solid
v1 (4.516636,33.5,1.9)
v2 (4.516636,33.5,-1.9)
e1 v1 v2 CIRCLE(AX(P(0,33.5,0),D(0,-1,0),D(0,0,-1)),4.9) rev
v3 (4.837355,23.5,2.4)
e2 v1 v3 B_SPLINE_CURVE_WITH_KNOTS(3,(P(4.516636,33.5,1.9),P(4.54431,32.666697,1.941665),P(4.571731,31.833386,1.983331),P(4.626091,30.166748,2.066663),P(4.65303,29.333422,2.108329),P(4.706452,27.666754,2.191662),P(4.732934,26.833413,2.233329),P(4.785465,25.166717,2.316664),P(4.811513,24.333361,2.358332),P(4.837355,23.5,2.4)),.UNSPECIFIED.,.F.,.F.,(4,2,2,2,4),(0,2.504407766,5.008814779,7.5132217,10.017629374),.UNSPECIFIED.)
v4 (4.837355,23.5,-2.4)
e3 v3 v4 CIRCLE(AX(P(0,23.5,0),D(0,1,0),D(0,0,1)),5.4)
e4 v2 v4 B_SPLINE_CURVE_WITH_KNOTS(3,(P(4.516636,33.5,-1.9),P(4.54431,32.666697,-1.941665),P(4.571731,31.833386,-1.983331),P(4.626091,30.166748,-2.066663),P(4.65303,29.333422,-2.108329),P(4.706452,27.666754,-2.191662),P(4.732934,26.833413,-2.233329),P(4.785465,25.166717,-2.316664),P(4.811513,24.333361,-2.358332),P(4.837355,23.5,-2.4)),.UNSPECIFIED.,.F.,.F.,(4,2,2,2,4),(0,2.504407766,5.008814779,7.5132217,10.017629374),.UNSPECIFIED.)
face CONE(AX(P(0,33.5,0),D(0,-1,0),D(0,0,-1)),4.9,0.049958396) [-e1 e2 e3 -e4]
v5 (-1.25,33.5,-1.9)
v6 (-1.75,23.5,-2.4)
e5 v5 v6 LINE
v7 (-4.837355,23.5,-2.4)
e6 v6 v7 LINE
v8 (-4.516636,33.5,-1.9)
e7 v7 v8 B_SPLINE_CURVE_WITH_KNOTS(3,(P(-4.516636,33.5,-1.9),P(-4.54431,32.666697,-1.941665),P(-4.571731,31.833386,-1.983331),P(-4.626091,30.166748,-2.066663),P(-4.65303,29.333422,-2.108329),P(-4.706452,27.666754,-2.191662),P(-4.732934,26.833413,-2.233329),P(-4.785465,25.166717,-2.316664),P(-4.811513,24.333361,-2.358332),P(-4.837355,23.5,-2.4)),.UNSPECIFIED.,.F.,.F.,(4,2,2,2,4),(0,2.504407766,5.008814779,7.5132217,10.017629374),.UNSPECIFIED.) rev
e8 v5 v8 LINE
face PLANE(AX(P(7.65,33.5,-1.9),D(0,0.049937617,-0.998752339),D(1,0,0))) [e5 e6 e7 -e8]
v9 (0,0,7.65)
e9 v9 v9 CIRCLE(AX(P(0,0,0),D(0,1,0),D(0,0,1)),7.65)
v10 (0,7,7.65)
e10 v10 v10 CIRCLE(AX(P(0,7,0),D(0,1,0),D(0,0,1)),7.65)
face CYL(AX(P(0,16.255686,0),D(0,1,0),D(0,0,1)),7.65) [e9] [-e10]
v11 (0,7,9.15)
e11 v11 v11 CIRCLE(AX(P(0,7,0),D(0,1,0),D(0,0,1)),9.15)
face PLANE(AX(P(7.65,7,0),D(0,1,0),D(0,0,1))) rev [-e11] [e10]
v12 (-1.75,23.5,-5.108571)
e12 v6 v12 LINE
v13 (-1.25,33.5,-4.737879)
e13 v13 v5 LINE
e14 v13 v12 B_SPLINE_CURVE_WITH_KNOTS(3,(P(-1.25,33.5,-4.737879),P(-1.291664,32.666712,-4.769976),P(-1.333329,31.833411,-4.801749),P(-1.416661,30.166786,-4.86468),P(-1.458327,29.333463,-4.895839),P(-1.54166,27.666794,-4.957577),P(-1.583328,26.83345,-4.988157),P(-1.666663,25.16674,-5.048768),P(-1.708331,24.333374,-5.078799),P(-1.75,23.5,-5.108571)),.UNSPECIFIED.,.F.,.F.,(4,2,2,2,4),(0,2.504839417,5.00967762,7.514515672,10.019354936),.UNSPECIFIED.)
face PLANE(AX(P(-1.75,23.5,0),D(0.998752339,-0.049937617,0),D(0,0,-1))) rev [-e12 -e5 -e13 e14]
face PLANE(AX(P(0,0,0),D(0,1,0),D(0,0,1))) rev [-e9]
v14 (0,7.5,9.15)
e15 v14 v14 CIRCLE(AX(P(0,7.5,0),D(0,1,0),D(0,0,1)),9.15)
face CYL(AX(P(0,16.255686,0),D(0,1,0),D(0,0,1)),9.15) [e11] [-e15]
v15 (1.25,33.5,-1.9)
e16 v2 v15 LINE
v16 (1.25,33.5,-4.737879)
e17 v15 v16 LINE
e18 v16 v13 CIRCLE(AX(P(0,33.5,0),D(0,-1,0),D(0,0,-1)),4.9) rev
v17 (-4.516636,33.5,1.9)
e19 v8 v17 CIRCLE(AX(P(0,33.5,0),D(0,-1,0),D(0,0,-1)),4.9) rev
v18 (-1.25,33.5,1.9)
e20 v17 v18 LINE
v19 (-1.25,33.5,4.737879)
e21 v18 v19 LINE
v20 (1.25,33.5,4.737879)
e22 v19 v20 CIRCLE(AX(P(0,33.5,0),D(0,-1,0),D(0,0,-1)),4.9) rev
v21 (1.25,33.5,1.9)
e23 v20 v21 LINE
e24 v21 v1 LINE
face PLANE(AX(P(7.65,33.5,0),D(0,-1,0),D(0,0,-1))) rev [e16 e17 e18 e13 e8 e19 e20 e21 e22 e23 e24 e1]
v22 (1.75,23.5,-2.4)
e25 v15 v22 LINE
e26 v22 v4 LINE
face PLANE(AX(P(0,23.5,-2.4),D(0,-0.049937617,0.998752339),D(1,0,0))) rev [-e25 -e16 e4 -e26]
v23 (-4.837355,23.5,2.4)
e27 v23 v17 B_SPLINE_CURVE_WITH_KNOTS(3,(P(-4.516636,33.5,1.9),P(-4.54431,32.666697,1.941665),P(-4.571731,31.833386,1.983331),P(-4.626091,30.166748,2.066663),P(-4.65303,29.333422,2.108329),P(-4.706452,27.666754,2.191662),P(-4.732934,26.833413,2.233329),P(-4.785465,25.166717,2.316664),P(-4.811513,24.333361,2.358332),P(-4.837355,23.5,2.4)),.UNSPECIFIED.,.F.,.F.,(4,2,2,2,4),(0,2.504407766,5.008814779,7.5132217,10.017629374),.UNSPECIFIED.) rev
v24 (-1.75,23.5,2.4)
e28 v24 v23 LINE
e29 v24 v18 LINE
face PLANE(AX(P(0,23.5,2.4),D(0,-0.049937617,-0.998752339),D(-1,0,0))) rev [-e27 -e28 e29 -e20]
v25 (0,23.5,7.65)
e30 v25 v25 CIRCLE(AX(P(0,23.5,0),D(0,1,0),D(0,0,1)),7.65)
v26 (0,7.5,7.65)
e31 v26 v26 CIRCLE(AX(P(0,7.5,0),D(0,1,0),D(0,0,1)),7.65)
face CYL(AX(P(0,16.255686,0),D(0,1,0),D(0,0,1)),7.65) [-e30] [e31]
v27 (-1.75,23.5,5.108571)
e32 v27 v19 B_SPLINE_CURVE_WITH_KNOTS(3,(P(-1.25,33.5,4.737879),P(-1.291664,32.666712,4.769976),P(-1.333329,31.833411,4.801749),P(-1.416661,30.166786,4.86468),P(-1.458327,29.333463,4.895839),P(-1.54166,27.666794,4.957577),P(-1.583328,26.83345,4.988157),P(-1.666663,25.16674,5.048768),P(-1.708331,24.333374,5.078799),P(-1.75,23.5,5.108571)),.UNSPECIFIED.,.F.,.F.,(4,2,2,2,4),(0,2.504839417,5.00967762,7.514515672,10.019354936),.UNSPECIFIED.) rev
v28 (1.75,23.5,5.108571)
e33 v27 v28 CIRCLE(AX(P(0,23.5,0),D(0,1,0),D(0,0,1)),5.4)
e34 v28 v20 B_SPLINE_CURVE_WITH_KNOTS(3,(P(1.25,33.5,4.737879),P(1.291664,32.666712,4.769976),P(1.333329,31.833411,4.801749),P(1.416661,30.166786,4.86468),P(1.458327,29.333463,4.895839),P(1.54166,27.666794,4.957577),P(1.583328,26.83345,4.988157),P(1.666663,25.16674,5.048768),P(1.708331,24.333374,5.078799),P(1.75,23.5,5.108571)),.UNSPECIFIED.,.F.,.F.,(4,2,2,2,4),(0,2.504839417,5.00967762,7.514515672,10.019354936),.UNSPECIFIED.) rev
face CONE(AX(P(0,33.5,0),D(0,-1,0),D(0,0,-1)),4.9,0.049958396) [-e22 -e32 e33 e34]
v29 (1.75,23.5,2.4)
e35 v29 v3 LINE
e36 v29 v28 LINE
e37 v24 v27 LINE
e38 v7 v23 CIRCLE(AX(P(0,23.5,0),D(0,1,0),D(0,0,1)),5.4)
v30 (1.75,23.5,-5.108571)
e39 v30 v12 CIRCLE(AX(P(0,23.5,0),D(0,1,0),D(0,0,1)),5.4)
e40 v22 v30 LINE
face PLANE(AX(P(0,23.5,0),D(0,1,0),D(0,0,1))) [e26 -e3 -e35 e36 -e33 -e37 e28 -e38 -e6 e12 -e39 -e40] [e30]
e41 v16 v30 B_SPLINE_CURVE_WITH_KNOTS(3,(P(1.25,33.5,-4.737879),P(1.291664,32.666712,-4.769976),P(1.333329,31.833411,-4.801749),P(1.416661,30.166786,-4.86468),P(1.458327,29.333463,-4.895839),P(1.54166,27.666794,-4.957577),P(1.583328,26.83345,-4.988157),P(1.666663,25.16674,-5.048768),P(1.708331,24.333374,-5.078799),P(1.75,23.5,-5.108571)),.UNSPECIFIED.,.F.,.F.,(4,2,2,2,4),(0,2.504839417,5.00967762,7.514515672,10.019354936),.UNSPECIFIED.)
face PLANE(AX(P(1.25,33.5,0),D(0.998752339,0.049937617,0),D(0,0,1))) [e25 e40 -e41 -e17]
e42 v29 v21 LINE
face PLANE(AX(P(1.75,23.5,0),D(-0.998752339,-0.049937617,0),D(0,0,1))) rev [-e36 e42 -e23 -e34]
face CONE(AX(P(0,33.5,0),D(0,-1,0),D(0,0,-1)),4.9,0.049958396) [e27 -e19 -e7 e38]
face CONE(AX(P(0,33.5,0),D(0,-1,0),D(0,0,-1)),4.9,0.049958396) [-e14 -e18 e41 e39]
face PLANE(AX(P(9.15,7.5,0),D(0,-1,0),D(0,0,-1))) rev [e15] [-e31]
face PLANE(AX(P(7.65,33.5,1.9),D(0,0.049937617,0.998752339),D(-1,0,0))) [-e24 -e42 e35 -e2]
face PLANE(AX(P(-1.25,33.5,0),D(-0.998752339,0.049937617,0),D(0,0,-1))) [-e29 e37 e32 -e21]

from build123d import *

# Parameters (mm, degrees)
SKETCH_594_R           = 7.65
CUT_EXTRUDE_2199_DEPTH = 10
CHAMFER_START          = -4.9
CHAMFER_1_2_DEPTH      = 3.6500001
CHAMFER_START_2        = 1.2499999
CHAMFER_1_3_DEPTH      = 3.6500001
CHAMFER_START_3        = -5.4
CHAMFER_1_4_DEPTH      = 3
CHAMFER_START_4        = 2.4
CHAMFER_1_5_DEPTH      = 3
CHAMFER_START_5        = -2.4
CHAMFER_1_6_DEPTH      = 4.8


with BuildPart() as part:
    # Sketch 286 → Revolve 549 (revolve)
    with BuildSketch(Plane.XY, mode=Mode.PRIVATE) as revolve_549_sk:
        Polygon((0, 0), (7.65, 0), (7.65, 7), (9.15, 7), (9.15, 7.5), (7.65, 7.5), (7.65, 33.5), (0, 33.5), align=None)
    revolve(revolve_549_sk.sketch.rotate(Axis((0, 16.255686087, 0), (0, -1, 0)), 90), axis=Axis((0, 16.255686087, 0), (0, -1, 0)))

    # Sketch 594 → Cut-Extrude 2199 (cut)
    with BuildSketch(Plane(origin=(0, 33.5, 0), x_dir=(1, 0, 0), z_dir=(0, 1, 0))):
        with Locations(Location((0, 0, 0), (0, 0, 270))):
            Circle(SKETCH_594_R)
        with BuildLine():
            Line((-1.75, 2.4), (-1.75, 5.108571229))
            ThreePointArc((-1.75, 5.108571229), (0, 5.4), (1.75, 5.108571229))
            Line((1.75, 5.108571229), (1.75, 2.4))
            Line((1.75, 2.4), (4.837354649, 2.4))
            ThreePointArc((4.837354649, 2.4), (5.4, 0), (4.837354649, -2.4))
            Line((4.837354649, -2.4), (1.75, -2.4))
            Line((1.75, -2.4), (1.75, -5.108571229))
            ThreePointArc((1.75, -5.108571229), (0, -5.4), (-1.75, -5.108571229))
            Line((-1.75, -5.108571229), (-1.75, -2.4))
            Line((-1.75, -2.4), (-4.837354649, -2.4))
            ThreePointArc((-4.837354649, -2.4), (-5.4, 0), (-4.837354649, 2.4))
            Line((-4.837354649, 2.4), (-1.75, 2.4))
        make_face(mode=Mode.SUBTRACT)
    extrude(amount=-CUT_EXTRUDE_2199_DEPTH, mode=Mode.SUBTRACT)

    # Фаска1: read off the stored shape, not the designer's step
    # Фаска1 outline → Фаска1 (revolve, cut)
    with BuildSketch(Plane.XY):
        Polygon((5.4, 33.5), (4.9, 33.5), (5.4, 23.5), align=None)
    revolve(axis=Axis((0, 0, 0), (0, 1, 0)), mode=Mode.SUBTRACT)

    # Chamfer 1 2 outline → Chamfer 1 2 (cut)
    with BuildSketch(Plane.YZ.offset(CHAMFER_START)):
        Polygon((23.5, 2.4), (33.5, 1.9), (33.5, 2.4), align=None)
        Polygon((33.5, -2.4), (33.5, -1.9), (23.5, -2.4), align=None)
    extrude(amount=CHAMFER_1_2_DEPTH, mode=Mode.SUBTRACT)

    # Chamfer 1 3 outline → Chamfer 1 3 (cut)
    with BuildSketch(Plane.YZ.offset(CHAMFER_START_2)):
        Polygon((23.5, 2.4), (33.5, 1.9), (33.5, 2.4), align=None)
        Polygon((33.5, -2.4), (33.5, -1.9), (23.5, -2.4), align=None)
    extrude(amount=CHAMFER_1_3_DEPTH, mode=Mode.SUBTRACT)

    # Chamfer 1 4 outline → Chamfer 1 4 (cut)
    with BuildSketch(Plane.XY.offset(CHAMFER_START_3)):
        Polygon((1.75, 33.5), (1.249999967, 33.5), (1.75, 23.5), align=None)
        Polygon((-1.75, 23.5), (-1.25, 33.5), (-1.75, 33.5), align=None)
    extrude(amount=CHAMFER_1_4_DEPTH, mode=Mode.SUBTRACT)

    # Chamfer 1 5 outline → Chamfer 1 5 (cut)
    with BuildSketch(Plane.XY.offset(CHAMFER_START_4)):
        Polygon((1.75, 33.5), (1.249999967, 33.5), (1.75, 23.5), align=None)
        Polygon((-1.75, 23.5), (-1.25, 33.5), (-1.75, 33.5), align=None)
    extrude(amount=CHAMFER_1_5_DEPTH, mode=Mode.SUBTRACT)

    # Chamfer 1 6 outline → Chamfer 1 6 (add)
    with BuildSketch(Plane.XY.offset(CHAMFER_START_5)):
        Polygon((1.75, 23.5), (1.25, 33.5), (1.2499999, 23.5), align=None)
        Polygon((-1.2499999, 23.5), (-1.2499999, 33.5), (-1.75, 23.5), align=None)
    extrude(amount=CHAMFER_1_6_DEPTH)


solid = part.part
